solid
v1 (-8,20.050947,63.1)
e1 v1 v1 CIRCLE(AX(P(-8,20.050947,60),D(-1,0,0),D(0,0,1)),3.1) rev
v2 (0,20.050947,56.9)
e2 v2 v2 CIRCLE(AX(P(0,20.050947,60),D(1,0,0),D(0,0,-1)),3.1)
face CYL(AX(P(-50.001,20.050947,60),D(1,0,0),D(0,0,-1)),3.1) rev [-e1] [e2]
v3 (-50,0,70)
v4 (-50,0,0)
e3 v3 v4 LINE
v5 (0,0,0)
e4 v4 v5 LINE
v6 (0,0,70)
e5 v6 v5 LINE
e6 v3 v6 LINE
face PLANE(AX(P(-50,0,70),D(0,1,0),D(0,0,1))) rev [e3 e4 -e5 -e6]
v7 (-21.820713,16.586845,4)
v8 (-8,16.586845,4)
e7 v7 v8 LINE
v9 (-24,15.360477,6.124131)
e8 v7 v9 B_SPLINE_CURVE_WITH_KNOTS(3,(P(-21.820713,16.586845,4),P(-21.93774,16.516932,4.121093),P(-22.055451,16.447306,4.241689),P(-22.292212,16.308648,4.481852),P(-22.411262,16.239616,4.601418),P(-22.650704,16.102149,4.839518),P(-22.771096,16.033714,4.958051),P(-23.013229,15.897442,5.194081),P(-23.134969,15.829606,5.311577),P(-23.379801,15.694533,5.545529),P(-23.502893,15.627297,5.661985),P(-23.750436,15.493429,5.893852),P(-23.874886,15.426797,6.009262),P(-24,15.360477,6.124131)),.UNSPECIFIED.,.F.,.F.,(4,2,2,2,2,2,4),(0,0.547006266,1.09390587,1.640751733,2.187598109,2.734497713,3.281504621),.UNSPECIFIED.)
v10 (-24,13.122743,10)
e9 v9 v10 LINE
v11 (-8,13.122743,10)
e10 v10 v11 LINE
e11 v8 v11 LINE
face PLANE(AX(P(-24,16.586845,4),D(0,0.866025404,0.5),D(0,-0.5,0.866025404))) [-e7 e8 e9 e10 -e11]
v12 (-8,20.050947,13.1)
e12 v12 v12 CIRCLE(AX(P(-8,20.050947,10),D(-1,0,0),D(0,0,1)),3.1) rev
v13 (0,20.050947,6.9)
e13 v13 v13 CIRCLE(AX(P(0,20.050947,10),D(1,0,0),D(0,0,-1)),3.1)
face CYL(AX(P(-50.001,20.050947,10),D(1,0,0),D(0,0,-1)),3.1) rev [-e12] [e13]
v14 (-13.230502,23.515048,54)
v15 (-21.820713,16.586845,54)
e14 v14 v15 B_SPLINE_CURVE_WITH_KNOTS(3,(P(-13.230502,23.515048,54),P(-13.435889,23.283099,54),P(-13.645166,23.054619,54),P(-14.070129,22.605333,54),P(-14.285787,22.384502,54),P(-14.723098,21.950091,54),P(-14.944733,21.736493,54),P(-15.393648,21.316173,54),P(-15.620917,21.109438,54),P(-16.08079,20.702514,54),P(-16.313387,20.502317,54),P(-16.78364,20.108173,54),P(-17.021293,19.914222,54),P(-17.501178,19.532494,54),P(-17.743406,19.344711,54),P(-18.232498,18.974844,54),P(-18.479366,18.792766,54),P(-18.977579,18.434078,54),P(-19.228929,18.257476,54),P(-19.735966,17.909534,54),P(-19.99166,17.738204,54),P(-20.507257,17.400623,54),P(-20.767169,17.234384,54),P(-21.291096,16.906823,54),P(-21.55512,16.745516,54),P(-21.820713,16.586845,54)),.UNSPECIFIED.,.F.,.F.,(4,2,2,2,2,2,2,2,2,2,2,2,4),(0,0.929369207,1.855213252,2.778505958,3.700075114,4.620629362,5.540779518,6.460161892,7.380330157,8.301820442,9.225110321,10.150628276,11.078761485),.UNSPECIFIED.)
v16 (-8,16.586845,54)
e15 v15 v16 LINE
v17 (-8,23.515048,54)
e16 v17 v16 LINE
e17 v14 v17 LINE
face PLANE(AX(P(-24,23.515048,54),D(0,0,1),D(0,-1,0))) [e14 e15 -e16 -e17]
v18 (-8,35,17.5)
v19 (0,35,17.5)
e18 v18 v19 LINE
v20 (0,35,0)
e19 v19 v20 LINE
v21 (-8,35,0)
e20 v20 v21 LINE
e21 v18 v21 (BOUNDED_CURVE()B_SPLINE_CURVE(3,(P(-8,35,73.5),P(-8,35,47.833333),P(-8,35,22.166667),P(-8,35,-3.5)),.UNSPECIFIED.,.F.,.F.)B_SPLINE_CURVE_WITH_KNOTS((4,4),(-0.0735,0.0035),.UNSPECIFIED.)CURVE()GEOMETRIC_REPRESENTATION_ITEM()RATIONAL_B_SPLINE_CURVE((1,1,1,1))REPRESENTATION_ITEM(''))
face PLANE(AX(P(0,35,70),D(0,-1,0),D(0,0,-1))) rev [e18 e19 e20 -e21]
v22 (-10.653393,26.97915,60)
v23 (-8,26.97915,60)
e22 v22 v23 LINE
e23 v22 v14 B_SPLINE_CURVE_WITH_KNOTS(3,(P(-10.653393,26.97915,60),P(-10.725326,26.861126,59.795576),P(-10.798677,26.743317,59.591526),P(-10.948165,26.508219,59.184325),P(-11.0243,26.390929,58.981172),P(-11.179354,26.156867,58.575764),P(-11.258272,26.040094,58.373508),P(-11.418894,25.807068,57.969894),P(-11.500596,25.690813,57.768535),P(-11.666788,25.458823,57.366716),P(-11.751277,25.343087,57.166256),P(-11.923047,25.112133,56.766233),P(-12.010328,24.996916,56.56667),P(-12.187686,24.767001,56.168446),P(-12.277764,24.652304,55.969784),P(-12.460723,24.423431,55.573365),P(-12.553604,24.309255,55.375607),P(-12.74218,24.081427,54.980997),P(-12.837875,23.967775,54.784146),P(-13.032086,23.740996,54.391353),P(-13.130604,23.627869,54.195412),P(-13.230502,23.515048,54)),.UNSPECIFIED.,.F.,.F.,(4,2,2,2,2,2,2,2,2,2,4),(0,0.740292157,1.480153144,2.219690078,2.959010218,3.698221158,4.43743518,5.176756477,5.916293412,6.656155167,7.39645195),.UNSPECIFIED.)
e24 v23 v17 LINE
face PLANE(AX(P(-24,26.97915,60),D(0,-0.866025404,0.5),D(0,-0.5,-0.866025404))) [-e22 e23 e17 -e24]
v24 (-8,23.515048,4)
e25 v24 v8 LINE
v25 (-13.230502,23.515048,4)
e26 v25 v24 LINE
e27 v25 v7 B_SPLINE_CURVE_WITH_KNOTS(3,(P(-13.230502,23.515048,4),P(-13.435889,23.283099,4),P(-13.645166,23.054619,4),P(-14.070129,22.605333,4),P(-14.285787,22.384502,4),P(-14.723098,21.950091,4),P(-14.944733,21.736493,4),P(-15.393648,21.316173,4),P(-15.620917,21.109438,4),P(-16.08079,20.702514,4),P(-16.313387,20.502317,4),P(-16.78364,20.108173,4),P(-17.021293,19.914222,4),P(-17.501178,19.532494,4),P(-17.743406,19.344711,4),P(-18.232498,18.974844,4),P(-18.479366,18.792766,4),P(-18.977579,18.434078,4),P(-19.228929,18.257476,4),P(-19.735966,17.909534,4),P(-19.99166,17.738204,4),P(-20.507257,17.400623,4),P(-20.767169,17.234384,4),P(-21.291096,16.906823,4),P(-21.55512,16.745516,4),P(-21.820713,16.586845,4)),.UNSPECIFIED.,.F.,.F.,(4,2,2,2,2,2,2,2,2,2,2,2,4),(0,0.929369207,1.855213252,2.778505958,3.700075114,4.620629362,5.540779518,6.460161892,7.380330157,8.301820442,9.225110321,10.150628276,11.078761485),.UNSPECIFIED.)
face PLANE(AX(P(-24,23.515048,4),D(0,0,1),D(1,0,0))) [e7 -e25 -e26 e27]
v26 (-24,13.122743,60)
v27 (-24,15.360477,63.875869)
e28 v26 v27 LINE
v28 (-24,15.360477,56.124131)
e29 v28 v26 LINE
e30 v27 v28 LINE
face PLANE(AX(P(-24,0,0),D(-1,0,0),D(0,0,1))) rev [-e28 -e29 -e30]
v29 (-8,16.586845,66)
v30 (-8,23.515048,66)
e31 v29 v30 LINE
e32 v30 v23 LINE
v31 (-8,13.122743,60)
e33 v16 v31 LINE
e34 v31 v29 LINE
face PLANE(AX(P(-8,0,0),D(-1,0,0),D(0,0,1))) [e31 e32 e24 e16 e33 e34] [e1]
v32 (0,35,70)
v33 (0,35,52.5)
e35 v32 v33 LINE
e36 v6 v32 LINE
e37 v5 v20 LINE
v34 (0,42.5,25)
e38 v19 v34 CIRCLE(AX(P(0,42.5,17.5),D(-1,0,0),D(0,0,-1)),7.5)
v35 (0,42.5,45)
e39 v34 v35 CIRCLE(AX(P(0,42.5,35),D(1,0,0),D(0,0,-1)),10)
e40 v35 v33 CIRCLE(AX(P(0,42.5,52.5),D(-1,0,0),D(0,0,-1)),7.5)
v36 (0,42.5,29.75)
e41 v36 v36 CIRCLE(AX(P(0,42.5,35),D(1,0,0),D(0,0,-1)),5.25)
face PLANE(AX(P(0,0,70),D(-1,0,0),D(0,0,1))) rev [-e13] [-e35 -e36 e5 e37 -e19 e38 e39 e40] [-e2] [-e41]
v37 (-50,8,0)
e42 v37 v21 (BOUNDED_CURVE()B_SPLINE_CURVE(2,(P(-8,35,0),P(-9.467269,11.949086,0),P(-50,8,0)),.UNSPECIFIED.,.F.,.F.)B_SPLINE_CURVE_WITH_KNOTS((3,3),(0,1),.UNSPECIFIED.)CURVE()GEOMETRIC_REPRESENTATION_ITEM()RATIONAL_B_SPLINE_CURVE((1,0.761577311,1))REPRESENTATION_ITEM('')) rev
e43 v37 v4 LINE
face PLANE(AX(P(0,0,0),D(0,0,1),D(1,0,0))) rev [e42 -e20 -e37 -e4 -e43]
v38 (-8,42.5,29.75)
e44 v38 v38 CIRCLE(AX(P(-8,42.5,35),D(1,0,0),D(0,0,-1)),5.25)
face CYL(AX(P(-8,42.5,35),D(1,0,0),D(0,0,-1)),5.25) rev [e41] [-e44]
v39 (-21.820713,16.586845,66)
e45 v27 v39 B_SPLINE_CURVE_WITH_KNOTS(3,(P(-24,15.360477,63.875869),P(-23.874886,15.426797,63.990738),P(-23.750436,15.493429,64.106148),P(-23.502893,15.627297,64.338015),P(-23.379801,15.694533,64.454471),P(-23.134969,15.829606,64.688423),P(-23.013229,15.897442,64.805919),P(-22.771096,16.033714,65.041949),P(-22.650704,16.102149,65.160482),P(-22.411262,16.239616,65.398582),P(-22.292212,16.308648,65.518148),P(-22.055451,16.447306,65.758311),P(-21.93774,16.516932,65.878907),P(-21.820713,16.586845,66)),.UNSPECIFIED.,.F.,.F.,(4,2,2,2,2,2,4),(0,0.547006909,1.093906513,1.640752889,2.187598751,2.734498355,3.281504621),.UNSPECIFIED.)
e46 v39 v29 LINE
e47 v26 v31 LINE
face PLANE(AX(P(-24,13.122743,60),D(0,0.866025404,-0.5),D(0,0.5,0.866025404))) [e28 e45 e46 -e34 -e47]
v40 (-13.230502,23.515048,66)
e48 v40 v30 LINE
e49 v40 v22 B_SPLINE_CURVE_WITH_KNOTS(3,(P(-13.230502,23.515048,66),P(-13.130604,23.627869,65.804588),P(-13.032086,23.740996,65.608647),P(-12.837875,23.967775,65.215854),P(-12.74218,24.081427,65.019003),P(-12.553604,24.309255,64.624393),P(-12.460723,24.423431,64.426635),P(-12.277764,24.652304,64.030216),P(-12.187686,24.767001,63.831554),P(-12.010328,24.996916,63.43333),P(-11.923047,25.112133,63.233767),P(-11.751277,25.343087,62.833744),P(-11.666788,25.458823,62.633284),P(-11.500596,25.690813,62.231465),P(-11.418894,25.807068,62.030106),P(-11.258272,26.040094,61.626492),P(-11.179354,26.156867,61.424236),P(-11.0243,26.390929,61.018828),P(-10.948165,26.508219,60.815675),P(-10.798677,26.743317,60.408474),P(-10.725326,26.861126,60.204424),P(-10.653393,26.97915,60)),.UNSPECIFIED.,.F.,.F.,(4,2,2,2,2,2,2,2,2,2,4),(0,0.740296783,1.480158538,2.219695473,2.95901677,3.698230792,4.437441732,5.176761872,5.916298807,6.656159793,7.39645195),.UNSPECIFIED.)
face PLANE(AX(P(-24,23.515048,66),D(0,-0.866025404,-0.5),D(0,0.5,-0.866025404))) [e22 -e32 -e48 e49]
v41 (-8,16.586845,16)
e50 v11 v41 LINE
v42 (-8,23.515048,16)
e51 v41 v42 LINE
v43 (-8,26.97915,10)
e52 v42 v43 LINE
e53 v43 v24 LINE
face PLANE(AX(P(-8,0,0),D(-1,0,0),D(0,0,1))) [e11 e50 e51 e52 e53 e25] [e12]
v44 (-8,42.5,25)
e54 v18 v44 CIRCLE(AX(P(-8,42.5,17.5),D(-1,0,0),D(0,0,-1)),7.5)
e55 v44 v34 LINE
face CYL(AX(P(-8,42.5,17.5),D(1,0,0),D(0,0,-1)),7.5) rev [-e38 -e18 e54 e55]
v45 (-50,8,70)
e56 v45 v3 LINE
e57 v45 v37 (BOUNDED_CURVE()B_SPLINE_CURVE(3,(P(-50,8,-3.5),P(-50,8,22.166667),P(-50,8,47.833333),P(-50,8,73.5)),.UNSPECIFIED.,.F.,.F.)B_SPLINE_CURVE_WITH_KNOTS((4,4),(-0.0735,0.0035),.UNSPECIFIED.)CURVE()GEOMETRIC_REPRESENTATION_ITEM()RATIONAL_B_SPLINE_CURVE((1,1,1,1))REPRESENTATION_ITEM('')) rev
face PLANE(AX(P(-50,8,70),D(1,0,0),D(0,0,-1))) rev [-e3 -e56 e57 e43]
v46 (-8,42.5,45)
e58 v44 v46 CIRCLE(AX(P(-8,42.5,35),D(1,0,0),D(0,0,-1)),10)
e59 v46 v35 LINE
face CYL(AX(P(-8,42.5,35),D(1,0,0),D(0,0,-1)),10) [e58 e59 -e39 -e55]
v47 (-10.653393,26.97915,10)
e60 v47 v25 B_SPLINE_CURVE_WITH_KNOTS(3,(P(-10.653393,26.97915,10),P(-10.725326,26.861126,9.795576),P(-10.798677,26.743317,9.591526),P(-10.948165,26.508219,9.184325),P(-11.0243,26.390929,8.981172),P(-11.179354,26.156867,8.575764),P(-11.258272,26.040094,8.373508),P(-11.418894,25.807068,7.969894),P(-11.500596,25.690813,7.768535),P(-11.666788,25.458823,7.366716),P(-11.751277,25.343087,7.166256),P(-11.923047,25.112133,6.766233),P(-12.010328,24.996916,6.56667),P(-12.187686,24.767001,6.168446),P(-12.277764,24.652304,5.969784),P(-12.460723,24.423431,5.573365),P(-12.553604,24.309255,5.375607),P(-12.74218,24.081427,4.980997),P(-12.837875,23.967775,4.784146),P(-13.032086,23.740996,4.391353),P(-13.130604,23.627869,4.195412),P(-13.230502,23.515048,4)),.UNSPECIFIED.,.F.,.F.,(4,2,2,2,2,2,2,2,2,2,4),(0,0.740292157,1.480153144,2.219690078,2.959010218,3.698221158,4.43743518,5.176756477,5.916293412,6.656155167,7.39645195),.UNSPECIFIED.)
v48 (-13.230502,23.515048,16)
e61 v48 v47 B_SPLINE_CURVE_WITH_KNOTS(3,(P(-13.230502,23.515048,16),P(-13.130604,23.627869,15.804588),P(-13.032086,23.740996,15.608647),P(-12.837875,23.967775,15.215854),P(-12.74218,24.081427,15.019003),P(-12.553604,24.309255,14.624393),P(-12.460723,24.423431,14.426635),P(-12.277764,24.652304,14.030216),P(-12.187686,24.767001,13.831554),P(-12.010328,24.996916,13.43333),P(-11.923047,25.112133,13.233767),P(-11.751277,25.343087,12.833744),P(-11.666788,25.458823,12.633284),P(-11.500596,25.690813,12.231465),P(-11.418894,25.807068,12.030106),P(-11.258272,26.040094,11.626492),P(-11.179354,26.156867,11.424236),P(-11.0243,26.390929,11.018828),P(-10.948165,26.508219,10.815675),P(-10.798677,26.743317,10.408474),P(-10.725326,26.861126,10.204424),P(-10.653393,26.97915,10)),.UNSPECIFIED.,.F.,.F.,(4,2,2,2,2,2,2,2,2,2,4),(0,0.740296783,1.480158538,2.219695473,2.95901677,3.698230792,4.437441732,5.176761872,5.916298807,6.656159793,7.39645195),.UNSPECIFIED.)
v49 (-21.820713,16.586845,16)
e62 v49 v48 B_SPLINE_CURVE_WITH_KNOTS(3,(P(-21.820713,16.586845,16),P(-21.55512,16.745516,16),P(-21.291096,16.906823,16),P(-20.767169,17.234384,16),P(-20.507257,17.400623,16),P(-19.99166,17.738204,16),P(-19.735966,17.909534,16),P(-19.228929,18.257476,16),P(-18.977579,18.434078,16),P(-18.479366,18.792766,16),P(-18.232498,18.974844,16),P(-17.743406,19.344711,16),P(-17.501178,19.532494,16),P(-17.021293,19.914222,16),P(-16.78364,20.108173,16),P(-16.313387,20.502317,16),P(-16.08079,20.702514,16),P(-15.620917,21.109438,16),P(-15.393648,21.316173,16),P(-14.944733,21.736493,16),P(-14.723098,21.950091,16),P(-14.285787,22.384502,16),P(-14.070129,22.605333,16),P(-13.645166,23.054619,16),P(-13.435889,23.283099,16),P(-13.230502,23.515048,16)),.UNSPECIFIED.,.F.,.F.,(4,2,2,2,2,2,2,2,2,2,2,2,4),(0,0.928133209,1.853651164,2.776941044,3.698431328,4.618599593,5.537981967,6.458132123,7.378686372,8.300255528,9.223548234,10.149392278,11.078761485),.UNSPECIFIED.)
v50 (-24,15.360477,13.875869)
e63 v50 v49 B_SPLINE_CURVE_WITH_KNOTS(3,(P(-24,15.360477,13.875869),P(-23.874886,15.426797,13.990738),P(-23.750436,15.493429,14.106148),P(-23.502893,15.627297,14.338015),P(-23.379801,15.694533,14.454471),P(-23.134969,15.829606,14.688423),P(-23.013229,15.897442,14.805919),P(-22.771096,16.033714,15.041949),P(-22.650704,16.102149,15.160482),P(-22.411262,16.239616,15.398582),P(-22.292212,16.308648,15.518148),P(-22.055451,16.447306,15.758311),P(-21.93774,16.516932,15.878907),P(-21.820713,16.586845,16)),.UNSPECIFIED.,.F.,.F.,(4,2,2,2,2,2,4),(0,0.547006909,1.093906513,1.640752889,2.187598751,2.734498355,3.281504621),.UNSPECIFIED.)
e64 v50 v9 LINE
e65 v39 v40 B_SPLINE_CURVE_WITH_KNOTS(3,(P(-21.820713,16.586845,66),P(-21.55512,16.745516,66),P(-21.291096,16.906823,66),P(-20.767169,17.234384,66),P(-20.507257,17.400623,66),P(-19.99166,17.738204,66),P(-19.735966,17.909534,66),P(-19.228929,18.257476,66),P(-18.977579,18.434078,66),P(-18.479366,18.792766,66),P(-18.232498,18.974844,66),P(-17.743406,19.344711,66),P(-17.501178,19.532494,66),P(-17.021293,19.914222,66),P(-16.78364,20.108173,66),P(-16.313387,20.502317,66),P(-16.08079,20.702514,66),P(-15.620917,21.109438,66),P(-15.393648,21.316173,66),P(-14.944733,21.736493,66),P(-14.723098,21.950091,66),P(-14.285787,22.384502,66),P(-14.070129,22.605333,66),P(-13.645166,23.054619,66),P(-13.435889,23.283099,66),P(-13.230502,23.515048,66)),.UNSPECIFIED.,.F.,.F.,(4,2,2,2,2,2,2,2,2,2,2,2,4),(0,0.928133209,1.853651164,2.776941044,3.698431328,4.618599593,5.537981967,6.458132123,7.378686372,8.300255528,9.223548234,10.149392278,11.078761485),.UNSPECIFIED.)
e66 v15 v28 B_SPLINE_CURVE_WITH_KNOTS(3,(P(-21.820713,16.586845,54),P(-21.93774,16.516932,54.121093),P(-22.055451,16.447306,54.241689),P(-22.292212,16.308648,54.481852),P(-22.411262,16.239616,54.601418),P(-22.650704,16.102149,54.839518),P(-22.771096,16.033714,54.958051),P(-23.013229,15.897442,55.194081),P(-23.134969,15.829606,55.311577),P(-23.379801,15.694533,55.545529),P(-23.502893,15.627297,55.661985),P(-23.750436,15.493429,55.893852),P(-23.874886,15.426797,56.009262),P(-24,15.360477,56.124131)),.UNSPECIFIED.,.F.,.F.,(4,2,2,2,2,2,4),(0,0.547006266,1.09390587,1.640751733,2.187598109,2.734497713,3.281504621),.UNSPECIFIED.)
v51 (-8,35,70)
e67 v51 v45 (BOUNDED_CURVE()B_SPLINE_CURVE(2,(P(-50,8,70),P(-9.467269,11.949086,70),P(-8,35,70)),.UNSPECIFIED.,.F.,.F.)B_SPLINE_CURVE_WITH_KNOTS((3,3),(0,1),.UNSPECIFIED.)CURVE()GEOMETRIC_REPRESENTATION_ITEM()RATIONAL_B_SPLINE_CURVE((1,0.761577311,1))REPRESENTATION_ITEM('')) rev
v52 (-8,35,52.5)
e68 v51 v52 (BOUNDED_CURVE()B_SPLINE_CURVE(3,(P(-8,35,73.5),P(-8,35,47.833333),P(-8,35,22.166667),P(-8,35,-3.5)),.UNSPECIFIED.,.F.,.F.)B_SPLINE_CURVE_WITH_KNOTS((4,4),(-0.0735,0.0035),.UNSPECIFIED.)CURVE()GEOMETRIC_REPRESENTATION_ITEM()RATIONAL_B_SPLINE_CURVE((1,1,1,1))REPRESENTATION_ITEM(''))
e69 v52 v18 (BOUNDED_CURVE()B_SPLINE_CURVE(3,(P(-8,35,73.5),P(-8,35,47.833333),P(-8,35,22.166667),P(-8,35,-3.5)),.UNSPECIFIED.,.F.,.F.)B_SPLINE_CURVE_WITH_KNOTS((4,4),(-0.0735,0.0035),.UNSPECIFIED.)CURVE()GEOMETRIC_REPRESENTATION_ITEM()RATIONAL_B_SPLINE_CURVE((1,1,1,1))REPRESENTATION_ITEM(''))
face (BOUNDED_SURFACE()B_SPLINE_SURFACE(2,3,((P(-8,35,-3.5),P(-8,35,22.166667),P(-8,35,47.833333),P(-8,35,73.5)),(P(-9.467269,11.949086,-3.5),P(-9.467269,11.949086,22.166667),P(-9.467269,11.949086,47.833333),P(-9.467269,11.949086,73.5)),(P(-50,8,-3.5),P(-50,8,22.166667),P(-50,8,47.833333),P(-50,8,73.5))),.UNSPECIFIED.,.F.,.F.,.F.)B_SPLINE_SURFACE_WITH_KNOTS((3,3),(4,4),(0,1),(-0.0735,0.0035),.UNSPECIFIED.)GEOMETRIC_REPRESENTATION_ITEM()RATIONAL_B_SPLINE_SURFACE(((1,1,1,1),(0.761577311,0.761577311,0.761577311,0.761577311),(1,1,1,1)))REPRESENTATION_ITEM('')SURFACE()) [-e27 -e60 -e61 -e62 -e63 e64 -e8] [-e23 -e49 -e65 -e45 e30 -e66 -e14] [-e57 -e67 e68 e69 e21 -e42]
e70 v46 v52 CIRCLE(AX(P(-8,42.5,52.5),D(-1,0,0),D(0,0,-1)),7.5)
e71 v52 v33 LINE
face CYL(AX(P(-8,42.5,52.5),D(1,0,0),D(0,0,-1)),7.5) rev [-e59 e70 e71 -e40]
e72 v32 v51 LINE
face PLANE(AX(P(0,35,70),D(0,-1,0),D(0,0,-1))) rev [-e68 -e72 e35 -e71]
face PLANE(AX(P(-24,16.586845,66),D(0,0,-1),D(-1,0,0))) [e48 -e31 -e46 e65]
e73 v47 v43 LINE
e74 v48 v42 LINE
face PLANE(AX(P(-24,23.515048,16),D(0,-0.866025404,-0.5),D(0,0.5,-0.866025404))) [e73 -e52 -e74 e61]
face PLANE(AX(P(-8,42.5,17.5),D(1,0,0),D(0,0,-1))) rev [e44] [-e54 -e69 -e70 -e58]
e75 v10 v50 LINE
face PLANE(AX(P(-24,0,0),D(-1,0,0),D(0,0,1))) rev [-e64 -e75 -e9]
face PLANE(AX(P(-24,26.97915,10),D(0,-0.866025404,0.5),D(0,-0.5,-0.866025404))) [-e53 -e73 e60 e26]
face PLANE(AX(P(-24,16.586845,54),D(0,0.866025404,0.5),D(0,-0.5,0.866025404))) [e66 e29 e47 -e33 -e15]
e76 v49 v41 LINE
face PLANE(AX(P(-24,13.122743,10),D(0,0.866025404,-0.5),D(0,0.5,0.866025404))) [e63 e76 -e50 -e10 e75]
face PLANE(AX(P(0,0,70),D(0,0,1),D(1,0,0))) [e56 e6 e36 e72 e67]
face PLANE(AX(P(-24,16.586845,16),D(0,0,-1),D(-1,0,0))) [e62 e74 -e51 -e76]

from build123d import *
from build123d.topology import SkipClean

# Parameters (mm, degrees)
RESSALTO_EXTRUS_O1_DEPTH = 70
CORTE_EXTRUS_O1_REACH    = 94.871
ESBO_O2_R                = 3.1
FILETE1_DEPTH            = 70
FILETE1_START            = -22
FILETE1_2_OUTLINE_R      = 3.1
FILETE1_2_DEPTH          = 14
ESBO_O3_R                = 5.25
RESSALTO_EXTRUS_O2_DEPTH = 8
CORTE_EXTRUS_O6_DEPTH    = 16


with BuildPart() as part:
    # Esboço1 → Ressalto-extrusão1 (new body)
    with BuildSketch(Plane.XY):
        Polygon((0, 0), (0, 35), (-8, 35), (-8, 8), (-50, 8), (-50, 0), align=None)
    extrude(amount=RESSALTO_EXTRUS_O1_DEPTH)

    # Esboço2 → Corte-extrusão1 (cut, up to next)
    with BuildSketch(Plane(origin=(0, 0, 0), x_dir=(0, 0, -1), z_dir=(1, 0, 0)), mode=Mode.PRIVATE) as corte_extrus_o1_sk1:
        with Locations((-60, 20.050946568)):
            Circle(ESBO_O2_R)
    corte_extrus_o1_tool1 = extrude(corte_extrus_o1_sk1.sketch, amount=-CORTE_EXTRUS_O1_REACH, mode=Mode.PRIVATE) & part.part
    # Esboço2 → Corte-extrusão1 (cut, up to next)
    with BuildSketch(Plane(origin=(0, 0, 0), x_dir=(0, 0, -1), z_dir=(1, 0, 0)), mode=Mode.PRIVATE) as corte_extrus_o1_sk2:
        with Locations((-10, 20.050946568)):
            Circle(ESBO_O2_R)
    corte_extrus_o1_tool2 = extrude(corte_extrus_o1_sk2.sketch, amount=-CORTE_EXTRUS_O1_REACH, mode=Mode.PRIVATE) & part.part
    add(corte_extrus_o1_tool1.solids().sort_by_distance((0, 20.050947, 60))[0], mode=Mode.SUBTRACT)
    add(corte_extrus_o1_tool2.solids().sort_by_distance((0, 20.050947, 10))[0], mode=Mode.SUBTRACT)

    # Filete1: read off the stored shape, not the designer's step
    # Filete1 outline → Filete1 (add)
    with BuildSketch(Plane.XY):
        with BuildLine():
            Line((-8, 8), (-8, 35))
            add(Edge.make_bspline(
                [(-8, 35), (-9.46726927, 11.949085531), (-50, 8)],
                knots=[0, 0, 0, 1, 1, 1], degree=2, weights=[1, 0.761577311, 1]))
            Line((-50, 8), (-8, 8))
        make_face()
    extrude(amount=FILETE1_DEPTH)

    # Filete1 2 outline → Filete1 2 (cut)
    with SkipClean():  # the faces are left unmerged after this step: merging them gives an invalid solid
        with BuildSketch(Plane.YZ.offset(FILETE1_START)):
            with Locations((20.050946568, 10)):
                Circle(FILETE1_2_OUTLINE_R)
            with Locations((20.050946568, 60)):
                Circle(FILETE1_2_OUTLINE_R)
        extrude(amount=FILETE1_2_DEPTH, mode=Mode.SUBTRACT)

    # Esboço3 → Ressalto-extrusão2 (add)
    with SkipClean():  # the faces are left unmerged after this step: merging them gives an invalid solid
        with BuildSketch(Plane(origin=(0, 0, 0), x_dir=(0, 0, -1), z_dir=(1, 0, 0))):
            with BuildLine():
                Line((-52.5, 35), (-17.5, 35))
                ThreePointArc((-17.5, 35), (-22.803300859, 37.196699141), (-25, 42.5))
                ThreePointArc((-25, 42.5), (-35, 52.5), (-45, 42.5))
                ThreePointArc((-45, 42.5), (-47.196699141, 37.196699141), (-52.5, 35))
            make_face()
            with Locations((-35, 42.5)):
                Circle(ESBO_O3_R, mode=Mode.SUBTRACT)
        extrude(amount=-RESSALTO_EXTRUS_O2_DEPTH)

    # Esboço6 → Corte-extrusão6 (cut)
    with BuildSketch(Plane.ZY.offset(8)):
        Polygon((4, 23.515048183), (4, 16.586844953), (10, 13.122743338), (16, 16.586844953), (16, 23.515048183), (10, 26.979149798), align=None)
        Polygon((54, 23.515048183), (54, 16.586844953), (60, 13.122743338), (66, 16.586844953), (66, 23.515048183), (60, 26.979149798), align=None)
    extrude(amount=CORTE_EXTRUS_O6_DEPTH, mode=Mode.SUBTRACT)


solid = part.part
